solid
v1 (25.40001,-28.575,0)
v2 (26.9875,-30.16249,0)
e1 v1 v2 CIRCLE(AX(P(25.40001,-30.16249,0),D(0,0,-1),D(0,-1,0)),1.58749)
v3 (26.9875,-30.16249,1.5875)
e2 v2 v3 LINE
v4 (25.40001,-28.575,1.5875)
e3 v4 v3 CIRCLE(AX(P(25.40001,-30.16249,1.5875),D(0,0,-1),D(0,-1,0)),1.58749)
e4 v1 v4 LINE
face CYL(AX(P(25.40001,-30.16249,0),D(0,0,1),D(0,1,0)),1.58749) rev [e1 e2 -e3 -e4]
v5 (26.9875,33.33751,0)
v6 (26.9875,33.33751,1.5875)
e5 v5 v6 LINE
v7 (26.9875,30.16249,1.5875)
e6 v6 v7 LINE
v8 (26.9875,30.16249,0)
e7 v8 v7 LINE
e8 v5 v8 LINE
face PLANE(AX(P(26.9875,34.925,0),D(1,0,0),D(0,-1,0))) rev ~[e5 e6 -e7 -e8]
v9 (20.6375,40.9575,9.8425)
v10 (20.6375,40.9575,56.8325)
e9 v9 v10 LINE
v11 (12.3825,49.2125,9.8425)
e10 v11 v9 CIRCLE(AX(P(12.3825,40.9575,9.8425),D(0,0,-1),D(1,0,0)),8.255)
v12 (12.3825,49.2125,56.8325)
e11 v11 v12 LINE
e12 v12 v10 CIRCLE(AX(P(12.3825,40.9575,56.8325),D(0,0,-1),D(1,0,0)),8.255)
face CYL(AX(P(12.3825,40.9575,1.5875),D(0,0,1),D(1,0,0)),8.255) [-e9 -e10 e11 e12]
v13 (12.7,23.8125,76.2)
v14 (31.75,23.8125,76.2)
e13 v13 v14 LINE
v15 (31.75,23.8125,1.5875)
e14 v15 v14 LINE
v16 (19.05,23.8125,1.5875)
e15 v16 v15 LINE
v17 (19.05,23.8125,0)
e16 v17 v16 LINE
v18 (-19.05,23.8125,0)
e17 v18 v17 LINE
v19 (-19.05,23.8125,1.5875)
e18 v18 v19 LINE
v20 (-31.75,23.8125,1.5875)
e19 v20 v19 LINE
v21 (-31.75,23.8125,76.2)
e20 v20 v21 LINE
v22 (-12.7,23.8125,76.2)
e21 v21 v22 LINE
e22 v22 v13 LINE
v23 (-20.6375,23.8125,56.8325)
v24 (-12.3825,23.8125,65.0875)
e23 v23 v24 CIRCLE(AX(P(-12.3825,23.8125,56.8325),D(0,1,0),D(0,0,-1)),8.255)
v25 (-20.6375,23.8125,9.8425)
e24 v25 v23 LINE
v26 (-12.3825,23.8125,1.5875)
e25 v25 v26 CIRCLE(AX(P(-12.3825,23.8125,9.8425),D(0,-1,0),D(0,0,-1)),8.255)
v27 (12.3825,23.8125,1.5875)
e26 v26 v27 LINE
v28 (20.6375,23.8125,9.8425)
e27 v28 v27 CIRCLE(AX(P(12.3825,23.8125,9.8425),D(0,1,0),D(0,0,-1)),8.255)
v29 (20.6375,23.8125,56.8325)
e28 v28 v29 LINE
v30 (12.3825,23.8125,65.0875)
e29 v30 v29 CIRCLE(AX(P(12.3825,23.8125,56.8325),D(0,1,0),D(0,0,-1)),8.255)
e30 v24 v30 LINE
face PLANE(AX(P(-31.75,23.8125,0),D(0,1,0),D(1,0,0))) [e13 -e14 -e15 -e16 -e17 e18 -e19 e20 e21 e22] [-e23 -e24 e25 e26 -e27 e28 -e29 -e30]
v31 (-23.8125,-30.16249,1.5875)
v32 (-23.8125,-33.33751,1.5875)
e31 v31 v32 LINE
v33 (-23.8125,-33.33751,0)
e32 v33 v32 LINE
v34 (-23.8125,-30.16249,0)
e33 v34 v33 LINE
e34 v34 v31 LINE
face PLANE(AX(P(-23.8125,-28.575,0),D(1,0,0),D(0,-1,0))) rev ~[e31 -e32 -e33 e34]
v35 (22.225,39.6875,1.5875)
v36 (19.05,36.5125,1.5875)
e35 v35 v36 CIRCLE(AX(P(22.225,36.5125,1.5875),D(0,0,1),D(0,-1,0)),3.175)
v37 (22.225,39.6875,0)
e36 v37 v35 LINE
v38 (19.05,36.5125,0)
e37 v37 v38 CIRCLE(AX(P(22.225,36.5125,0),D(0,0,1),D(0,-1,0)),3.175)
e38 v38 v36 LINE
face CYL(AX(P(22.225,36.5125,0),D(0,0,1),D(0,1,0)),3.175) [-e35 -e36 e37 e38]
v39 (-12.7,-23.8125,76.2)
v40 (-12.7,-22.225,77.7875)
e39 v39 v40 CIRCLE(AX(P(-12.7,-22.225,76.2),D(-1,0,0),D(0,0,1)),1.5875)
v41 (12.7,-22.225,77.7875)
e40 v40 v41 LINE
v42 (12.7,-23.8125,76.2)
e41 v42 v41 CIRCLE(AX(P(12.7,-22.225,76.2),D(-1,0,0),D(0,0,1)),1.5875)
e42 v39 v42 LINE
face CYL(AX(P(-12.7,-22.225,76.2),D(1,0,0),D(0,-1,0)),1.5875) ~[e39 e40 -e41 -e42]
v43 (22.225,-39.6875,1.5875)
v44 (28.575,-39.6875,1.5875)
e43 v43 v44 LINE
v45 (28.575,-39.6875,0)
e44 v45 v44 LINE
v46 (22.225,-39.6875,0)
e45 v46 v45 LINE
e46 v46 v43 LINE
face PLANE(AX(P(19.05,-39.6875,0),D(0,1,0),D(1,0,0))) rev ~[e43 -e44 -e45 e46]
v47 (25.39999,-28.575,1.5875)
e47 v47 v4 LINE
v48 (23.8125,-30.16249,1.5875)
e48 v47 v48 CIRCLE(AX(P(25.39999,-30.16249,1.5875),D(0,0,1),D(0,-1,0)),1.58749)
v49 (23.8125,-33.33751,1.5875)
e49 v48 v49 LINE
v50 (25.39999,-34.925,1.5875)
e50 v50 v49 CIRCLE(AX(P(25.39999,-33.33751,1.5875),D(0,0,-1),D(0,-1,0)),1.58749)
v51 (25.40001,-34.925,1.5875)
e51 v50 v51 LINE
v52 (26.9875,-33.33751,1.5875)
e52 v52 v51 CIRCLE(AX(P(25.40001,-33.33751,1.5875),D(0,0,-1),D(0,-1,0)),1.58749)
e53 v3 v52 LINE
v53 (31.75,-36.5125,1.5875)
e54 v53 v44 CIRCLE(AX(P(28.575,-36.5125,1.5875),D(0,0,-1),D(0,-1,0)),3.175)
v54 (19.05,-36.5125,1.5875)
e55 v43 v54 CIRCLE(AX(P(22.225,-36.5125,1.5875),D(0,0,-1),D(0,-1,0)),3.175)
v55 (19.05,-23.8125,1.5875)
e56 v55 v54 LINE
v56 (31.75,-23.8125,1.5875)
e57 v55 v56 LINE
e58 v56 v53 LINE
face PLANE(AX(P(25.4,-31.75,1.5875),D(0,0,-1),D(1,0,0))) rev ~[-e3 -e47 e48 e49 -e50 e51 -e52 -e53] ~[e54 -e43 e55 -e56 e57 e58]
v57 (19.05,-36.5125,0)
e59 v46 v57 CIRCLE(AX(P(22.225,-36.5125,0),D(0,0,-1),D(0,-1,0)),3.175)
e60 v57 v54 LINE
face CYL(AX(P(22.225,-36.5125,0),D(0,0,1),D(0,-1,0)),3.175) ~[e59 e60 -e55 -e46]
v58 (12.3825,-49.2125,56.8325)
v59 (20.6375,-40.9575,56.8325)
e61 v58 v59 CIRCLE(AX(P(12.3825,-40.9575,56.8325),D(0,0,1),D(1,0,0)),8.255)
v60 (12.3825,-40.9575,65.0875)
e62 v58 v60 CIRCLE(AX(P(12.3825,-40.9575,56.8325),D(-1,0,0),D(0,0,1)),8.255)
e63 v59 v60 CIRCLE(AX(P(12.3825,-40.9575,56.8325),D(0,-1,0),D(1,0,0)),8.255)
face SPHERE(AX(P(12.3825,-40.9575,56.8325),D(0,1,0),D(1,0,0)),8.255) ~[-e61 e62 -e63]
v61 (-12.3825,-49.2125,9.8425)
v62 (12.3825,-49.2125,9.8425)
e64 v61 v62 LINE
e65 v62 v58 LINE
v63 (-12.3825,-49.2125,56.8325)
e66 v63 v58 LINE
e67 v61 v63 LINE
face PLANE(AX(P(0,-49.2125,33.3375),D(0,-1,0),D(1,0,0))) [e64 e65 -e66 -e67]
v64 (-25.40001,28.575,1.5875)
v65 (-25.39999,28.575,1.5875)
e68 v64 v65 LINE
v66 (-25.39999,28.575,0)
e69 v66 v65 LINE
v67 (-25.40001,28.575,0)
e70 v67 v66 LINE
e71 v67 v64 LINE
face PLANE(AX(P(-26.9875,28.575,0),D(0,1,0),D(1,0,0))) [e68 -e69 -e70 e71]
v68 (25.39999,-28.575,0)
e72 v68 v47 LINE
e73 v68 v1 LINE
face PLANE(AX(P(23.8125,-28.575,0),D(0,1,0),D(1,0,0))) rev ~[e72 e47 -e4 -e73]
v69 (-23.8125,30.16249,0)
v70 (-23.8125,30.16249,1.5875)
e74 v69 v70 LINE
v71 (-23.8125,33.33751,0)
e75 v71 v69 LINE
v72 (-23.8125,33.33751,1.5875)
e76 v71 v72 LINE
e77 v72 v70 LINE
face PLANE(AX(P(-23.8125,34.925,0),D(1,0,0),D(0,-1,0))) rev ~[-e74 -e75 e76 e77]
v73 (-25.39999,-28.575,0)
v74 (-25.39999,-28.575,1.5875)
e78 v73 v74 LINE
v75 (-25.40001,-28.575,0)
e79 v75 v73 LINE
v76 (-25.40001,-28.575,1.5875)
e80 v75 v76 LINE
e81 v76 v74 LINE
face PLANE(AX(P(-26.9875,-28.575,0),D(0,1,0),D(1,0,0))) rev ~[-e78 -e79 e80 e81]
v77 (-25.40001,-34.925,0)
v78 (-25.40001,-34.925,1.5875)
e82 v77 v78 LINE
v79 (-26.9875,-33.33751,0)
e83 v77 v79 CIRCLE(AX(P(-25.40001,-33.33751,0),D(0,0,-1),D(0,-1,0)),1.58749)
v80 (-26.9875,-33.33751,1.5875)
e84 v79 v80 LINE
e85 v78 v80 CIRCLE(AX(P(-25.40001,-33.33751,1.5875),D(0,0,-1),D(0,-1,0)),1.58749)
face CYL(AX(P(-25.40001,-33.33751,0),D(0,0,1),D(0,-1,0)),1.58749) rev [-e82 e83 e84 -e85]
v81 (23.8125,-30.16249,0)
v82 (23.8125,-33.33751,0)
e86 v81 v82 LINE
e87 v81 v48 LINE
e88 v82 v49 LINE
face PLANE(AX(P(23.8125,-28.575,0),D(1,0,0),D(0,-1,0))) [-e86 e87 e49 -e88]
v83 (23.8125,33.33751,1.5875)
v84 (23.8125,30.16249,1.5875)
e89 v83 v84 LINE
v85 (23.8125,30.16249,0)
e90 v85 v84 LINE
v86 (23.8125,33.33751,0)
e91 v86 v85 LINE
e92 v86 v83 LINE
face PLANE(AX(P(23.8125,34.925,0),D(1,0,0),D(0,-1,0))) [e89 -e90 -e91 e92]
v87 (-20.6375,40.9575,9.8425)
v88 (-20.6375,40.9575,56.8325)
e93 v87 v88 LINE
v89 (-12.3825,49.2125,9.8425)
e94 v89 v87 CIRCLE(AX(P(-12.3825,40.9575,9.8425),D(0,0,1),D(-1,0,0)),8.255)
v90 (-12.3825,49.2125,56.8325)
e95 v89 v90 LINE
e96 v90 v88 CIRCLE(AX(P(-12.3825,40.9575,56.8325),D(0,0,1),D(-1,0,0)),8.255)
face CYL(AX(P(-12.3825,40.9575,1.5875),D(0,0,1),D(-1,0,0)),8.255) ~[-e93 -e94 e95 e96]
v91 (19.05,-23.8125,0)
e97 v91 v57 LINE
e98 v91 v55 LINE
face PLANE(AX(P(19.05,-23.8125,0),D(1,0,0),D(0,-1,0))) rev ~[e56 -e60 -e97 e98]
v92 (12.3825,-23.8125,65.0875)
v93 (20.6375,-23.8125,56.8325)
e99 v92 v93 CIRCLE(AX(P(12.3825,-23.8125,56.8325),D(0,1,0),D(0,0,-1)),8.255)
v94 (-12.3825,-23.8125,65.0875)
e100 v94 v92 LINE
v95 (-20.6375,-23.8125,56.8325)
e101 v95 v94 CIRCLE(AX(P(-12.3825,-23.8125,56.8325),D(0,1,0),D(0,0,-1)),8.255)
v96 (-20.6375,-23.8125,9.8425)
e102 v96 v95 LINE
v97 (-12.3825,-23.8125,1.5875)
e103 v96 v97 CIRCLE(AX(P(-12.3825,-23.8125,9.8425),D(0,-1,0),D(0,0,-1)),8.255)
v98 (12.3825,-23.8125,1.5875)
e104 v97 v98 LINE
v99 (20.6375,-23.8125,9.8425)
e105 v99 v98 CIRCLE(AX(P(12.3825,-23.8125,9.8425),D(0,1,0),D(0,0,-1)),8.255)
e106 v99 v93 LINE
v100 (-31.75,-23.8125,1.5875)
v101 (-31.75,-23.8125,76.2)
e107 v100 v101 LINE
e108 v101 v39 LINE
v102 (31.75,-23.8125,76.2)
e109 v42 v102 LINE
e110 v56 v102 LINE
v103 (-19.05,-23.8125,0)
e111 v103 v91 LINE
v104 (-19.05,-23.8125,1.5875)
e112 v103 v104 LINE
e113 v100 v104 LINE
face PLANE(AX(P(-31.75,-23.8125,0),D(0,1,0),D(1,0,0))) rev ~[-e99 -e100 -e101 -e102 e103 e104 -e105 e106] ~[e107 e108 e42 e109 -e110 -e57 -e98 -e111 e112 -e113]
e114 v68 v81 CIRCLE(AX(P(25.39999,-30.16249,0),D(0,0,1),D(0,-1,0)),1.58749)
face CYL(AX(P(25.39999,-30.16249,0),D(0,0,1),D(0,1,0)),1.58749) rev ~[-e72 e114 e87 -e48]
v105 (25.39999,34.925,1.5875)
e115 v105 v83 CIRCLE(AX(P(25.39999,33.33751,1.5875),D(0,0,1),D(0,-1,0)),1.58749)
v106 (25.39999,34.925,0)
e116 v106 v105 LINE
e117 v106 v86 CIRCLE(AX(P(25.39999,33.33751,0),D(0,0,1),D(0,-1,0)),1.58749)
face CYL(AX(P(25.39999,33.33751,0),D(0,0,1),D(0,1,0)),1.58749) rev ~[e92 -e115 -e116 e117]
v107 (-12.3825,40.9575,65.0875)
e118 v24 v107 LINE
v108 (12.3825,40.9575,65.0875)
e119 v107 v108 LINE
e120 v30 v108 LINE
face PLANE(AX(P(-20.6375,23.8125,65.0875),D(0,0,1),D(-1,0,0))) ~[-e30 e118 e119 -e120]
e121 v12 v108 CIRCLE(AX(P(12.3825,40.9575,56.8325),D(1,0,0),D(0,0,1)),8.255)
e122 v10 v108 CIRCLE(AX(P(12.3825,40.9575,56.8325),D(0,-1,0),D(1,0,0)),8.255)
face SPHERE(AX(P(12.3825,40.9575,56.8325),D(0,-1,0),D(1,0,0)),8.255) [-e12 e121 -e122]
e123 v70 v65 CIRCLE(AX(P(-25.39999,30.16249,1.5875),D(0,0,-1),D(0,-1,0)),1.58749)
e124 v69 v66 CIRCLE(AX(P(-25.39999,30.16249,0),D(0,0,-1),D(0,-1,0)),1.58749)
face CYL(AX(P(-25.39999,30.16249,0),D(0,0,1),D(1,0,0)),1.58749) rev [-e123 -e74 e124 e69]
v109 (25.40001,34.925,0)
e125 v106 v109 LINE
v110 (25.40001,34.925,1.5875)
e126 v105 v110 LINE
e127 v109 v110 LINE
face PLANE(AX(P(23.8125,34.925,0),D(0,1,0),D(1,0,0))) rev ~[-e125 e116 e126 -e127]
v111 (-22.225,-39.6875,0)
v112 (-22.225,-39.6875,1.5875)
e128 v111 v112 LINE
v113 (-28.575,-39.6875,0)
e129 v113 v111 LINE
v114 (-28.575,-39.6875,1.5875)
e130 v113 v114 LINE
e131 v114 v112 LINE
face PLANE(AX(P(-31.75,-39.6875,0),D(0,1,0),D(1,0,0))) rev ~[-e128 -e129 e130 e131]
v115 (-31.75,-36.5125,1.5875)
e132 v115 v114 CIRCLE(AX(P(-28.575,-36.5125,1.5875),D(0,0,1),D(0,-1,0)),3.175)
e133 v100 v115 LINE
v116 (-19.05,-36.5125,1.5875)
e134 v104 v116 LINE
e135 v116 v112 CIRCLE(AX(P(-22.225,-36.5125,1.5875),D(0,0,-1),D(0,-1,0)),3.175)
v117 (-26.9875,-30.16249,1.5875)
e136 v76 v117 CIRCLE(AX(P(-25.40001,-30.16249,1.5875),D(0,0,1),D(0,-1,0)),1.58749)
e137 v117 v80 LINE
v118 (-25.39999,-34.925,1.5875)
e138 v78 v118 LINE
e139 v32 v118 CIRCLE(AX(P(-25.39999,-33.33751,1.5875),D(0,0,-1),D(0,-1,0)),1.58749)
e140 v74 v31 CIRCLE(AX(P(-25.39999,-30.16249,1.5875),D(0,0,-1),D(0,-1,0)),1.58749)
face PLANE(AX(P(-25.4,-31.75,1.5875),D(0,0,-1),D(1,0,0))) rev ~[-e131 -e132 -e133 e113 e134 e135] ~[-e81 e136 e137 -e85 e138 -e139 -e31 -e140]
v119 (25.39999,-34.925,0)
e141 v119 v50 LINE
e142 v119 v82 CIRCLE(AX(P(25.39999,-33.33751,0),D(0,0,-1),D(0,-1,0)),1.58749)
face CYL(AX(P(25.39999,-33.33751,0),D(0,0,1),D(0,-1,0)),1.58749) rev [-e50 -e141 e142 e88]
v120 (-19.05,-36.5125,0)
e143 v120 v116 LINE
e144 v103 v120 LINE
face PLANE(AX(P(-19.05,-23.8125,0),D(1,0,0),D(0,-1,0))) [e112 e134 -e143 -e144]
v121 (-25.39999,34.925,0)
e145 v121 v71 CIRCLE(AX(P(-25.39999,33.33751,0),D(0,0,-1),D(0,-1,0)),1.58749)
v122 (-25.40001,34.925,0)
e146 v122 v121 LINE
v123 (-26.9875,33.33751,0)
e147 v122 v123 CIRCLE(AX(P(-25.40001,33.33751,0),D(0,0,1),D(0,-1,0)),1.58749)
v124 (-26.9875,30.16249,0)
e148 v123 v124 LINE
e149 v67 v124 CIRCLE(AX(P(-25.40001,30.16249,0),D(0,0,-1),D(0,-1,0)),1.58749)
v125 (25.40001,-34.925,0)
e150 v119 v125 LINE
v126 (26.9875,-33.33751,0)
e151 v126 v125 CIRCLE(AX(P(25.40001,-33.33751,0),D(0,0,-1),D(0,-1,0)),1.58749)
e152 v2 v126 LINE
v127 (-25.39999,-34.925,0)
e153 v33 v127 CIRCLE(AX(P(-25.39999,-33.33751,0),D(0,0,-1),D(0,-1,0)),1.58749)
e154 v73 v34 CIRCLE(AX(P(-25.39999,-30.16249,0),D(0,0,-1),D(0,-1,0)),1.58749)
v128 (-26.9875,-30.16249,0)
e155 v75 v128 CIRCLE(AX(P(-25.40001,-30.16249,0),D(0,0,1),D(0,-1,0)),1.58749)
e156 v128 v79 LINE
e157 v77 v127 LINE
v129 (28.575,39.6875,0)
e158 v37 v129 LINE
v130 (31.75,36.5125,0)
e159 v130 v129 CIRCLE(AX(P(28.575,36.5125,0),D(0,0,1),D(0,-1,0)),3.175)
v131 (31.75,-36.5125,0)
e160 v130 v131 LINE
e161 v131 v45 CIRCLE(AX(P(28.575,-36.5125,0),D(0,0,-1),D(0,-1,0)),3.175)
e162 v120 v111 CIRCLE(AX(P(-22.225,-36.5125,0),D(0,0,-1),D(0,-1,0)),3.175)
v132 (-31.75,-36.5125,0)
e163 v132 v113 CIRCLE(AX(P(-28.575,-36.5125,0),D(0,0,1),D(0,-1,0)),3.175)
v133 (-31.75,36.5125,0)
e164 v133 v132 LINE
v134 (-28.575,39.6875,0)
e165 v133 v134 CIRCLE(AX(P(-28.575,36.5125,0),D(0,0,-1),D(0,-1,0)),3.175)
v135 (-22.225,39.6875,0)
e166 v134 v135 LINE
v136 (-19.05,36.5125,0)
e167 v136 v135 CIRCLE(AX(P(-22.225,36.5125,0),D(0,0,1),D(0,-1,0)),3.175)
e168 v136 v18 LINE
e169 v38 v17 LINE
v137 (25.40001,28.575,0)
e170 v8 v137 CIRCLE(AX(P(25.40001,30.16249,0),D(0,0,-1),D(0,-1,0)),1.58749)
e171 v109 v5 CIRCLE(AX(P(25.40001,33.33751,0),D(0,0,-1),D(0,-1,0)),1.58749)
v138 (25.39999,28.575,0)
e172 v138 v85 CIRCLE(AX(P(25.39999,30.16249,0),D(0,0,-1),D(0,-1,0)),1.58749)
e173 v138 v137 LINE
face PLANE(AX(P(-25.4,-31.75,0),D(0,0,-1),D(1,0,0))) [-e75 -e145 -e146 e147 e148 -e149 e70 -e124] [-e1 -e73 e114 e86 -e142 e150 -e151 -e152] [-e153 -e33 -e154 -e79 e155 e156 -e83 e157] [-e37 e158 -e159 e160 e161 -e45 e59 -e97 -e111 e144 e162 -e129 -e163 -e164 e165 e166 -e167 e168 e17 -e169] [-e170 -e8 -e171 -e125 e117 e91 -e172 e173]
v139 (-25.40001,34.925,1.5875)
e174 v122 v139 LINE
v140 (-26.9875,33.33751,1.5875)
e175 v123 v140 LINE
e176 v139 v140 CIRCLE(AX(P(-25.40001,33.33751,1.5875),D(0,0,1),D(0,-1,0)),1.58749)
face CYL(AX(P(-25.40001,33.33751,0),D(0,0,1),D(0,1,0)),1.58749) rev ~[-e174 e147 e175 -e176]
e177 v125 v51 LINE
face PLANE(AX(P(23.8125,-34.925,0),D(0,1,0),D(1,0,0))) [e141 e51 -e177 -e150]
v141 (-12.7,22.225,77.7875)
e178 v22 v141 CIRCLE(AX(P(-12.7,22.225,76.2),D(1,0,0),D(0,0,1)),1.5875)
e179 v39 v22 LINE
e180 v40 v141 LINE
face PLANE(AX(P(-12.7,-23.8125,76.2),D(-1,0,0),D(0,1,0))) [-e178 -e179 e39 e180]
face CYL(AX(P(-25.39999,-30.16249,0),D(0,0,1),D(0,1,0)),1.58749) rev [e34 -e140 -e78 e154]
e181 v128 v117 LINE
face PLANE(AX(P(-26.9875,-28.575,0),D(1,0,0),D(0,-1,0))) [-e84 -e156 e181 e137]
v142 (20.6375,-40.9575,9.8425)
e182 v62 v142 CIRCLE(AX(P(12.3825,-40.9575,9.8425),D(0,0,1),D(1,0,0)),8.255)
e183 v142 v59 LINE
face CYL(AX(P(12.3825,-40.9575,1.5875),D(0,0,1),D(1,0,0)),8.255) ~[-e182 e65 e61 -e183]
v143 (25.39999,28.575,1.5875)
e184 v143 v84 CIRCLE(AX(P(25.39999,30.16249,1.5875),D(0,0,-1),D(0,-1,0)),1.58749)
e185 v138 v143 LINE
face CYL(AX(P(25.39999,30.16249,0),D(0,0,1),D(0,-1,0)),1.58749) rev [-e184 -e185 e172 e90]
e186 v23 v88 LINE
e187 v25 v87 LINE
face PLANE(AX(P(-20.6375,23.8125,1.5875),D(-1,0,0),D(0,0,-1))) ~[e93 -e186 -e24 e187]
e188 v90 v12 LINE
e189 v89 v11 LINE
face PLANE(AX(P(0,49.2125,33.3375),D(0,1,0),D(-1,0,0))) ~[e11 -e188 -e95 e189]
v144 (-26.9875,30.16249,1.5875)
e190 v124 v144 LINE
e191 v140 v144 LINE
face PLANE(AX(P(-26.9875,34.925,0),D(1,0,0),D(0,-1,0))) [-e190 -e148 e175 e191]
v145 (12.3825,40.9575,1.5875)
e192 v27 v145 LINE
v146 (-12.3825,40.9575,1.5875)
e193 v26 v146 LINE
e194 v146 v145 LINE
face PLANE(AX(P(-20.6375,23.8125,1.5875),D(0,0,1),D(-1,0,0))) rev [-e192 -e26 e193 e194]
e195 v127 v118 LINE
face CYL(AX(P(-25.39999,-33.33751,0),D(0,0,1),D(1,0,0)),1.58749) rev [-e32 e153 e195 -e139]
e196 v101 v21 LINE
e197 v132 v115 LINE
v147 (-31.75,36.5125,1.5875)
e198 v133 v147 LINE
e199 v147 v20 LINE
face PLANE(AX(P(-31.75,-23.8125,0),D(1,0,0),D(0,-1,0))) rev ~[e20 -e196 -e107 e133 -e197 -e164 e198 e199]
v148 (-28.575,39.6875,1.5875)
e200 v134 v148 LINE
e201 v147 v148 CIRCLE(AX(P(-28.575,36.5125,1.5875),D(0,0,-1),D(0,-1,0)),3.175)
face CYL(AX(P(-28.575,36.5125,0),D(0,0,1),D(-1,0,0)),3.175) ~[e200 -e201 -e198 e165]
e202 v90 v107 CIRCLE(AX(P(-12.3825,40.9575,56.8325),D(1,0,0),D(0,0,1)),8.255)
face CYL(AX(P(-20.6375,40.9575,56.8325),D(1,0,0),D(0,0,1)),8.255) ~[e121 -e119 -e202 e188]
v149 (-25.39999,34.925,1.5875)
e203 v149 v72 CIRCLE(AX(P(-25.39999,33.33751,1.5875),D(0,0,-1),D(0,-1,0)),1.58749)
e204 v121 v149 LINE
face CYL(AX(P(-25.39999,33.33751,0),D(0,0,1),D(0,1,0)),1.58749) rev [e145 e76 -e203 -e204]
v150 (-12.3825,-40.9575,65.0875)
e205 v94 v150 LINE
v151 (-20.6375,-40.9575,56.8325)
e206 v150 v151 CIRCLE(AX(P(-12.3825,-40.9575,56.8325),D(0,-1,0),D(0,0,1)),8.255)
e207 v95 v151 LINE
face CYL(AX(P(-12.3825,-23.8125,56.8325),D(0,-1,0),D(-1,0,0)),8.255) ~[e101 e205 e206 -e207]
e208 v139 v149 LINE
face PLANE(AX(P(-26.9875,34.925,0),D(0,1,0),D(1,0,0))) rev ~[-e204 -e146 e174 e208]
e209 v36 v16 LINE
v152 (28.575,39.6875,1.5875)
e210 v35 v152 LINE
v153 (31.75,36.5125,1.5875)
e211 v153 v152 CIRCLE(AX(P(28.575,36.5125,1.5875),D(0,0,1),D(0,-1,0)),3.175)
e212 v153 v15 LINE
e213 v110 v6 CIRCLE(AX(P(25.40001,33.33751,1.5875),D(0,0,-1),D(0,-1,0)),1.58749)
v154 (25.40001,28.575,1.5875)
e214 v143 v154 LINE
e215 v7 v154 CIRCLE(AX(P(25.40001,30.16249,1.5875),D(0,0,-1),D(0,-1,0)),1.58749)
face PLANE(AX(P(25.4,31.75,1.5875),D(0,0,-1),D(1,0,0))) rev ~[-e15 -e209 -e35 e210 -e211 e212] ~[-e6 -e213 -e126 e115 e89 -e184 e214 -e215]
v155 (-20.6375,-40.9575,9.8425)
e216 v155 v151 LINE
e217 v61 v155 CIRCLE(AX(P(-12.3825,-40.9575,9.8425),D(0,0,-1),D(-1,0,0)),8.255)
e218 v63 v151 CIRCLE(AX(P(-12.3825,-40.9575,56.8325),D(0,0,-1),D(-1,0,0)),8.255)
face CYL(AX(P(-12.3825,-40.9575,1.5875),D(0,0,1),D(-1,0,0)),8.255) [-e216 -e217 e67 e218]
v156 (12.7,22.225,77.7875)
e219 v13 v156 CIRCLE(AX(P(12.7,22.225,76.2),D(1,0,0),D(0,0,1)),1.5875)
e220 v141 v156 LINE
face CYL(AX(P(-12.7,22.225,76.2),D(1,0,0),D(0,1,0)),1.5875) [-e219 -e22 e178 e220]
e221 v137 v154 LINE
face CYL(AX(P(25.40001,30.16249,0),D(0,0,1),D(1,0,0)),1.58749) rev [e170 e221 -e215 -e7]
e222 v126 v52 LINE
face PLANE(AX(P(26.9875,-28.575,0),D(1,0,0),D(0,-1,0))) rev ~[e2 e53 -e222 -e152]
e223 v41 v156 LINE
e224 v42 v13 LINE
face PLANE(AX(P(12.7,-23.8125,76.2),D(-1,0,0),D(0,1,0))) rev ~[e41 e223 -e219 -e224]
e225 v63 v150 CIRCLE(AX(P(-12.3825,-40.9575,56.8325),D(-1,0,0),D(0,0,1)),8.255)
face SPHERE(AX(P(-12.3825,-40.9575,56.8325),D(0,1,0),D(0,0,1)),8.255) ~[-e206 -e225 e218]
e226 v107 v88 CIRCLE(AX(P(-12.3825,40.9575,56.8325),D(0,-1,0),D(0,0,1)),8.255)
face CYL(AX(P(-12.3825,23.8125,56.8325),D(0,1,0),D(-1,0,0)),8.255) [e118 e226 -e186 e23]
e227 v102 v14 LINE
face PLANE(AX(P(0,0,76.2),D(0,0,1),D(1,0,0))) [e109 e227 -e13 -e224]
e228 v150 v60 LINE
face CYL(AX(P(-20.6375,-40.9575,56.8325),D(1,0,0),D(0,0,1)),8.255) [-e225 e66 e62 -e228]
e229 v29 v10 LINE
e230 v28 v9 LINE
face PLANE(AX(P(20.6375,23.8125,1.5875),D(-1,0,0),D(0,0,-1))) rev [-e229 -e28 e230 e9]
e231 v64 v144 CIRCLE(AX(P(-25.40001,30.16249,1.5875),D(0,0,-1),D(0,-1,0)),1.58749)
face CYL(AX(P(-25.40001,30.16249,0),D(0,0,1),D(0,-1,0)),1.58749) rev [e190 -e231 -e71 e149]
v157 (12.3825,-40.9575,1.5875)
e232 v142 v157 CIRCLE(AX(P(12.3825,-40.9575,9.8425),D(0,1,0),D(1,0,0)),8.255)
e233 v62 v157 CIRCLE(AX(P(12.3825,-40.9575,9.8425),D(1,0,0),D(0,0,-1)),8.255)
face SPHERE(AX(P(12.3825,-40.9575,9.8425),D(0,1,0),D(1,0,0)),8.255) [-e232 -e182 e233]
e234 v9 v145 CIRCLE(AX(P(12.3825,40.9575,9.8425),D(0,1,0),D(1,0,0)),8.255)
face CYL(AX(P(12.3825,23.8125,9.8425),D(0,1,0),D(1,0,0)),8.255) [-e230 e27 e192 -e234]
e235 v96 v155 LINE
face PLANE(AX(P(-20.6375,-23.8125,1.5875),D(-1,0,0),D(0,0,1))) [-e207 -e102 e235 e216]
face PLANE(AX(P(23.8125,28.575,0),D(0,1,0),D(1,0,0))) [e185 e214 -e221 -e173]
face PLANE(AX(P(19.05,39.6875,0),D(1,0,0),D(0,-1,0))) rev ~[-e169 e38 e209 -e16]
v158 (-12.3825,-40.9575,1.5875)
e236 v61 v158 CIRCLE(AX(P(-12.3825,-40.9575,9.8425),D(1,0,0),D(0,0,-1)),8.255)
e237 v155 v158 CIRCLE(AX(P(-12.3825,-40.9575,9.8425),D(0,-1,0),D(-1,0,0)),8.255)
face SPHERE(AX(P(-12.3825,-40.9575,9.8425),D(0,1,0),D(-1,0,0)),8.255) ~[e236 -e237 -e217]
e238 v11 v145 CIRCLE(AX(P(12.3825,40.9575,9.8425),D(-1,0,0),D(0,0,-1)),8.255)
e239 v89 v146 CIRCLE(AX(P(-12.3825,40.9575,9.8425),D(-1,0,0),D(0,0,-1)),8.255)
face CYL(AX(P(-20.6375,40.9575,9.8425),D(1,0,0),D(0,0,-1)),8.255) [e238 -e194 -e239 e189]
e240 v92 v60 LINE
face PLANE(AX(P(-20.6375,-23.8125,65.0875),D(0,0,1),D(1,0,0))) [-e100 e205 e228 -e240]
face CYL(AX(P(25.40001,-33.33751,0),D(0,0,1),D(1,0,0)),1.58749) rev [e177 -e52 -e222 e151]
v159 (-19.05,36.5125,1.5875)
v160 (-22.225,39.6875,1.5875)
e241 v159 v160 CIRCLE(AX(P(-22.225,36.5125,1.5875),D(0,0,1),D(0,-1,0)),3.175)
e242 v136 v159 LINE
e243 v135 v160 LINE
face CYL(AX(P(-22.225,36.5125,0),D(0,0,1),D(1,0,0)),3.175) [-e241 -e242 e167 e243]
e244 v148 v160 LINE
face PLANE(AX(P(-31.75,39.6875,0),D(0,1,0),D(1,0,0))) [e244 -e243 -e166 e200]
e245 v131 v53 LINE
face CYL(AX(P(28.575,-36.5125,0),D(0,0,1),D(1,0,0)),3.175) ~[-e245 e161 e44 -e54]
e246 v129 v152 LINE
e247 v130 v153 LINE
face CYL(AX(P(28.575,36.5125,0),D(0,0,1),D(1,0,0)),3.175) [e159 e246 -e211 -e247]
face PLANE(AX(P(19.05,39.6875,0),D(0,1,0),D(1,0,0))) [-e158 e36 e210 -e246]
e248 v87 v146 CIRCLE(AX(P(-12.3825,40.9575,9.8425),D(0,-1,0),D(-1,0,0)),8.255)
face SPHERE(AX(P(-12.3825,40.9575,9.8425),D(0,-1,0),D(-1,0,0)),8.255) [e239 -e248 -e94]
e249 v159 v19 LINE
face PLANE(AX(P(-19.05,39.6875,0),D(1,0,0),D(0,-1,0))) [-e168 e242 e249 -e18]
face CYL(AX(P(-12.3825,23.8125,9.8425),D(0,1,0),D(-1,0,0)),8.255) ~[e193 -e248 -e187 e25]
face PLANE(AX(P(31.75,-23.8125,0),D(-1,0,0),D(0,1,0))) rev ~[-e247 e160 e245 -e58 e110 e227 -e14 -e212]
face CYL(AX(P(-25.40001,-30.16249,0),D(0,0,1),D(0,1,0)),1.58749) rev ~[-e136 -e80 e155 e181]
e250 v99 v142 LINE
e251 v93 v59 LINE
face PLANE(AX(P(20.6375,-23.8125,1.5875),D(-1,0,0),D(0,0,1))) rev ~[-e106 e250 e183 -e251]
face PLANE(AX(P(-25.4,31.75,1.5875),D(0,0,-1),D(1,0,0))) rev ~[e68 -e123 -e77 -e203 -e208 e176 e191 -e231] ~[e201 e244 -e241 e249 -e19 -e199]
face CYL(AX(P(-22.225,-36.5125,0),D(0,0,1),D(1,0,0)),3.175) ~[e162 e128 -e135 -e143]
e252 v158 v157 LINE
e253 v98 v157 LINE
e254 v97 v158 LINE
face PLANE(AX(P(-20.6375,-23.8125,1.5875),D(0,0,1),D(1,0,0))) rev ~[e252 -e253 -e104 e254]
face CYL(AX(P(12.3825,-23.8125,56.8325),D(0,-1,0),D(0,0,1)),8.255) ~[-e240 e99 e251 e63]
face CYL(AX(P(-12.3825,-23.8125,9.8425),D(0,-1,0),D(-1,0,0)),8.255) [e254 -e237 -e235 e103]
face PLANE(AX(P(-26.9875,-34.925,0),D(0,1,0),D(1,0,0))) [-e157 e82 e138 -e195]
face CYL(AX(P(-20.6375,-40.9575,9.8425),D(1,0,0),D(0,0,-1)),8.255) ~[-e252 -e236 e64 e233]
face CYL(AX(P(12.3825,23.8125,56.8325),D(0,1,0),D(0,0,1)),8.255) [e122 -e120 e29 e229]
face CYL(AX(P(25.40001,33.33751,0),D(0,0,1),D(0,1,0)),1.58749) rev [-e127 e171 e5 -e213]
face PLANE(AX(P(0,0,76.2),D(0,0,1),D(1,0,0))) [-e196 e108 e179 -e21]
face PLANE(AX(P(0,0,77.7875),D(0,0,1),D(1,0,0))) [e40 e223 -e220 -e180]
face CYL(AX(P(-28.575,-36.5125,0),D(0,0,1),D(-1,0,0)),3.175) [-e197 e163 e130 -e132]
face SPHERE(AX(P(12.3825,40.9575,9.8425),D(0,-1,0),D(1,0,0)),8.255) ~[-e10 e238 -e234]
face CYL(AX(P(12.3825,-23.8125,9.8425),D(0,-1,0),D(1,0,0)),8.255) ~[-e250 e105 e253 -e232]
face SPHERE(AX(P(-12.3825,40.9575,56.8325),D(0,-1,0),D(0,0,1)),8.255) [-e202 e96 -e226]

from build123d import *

# Parameters (mm, degrees)
F0_W      = 63.5
F0_H      = 47.625
F1_DEPTH  = 76.2
F2_W      = 41.275
F2_H      = 63.5
F3_DEPTH  = 25.4
F4_R      = 8.255
F6_W      = 12.7
F6_H      = 15.875
F7_DEPTH  = 1.5875
F8_R      = 3.175
F9_W      = 3.175
F9_H      = 6.35
F10_DEPTH = 25.4
F11_R     = 1.58749
F12_W     = 25.4
F12_H     = 47.625
F13_DEPTH = 1.5875
F14_R     = 1.5875


# Not quite as in the source:
# - a fillet or chamfer is up to 0.001 mm smaller than in the source, because OpenCascade refuses the exact size


with BuildPart() as f1:
    # F0 (on Top) → F1 (new body)
    with BuildSketch(Plane.XY):
        Rectangle(F0_W, F0_H)
    extrude(amount=F1_DEPTH)

    # F2 (on face) → F3 (join)
    with BuildSketch(Plane.XZ.offset(23.8125)):
        with Locations((0, 33.3375)):
            Rectangle(F2_W, F2_H)
    extrude(amount=F3_DEPTH)

    # F4
    f4_edges = [f1.edges().sort_by_distance(p)[0] for p in [
        (-20.6375, -36.5125, 65.0875),
        (20.6375, -36.5125, 65.0875),
        (-20.6375, -36.5125, 1.5875),
        (20.6375, -36.5125, 1.5875),
        (20.6375, -49.2125, 33.3375),
        (0, -49.2125, 65.0875),
        (-20.6375, -49.2125, 33.3375),
        (0, -49.2125, 1.5875),
    ]]
    fillet(f4_edges, radius=F4_R)

    # F5: F1 across plane


with BuildPart() as f1_1:
    add(f1.part)
    add(f1.part.mirror(Plane.XZ))

    # F6 (on face) → F7 (join)
    with BuildSketch(Plane(origin=(0, 0, 0), x_dir=(1, 0, 0), z_dir=(0, 0, -1))):
        with Locations((-25.4, 31.75)):
            Rectangle(F6_W, F6_H)
        with Locations((25.4, 31.75)):
            Rectangle(F6_W, F6_H)
        with Locations((25.4, -31.75)):
            Rectangle(F6_W, F6_H)
        with Locations((-25.4, -31.75)):
            Rectangle(F6_W, F6_H)
    extrude(amount=-F7_DEPTH)

    # F8
    f8_edges = [f1_1.edges().sort_by_distance(p)[0] for p in [
        (-31.75, -39.6875, 0.79375),
        (-19.05, -39.6875, 0.79375),
        (19.05, -39.6875, 0.79375),
        (31.75, -39.6875, 0.79375),
        (31.75, 39.6875, 0.79375),
        (19.05, 39.6875, 0.79375),
        (-19.05, 39.6875, 0.79375),
        (-31.75, 39.6875, 0.79375),
    ]]
    fillet(f8_edges, radius=F8_R)

    # F9 (on face) → F10 (cut)
    with BuildSketch(Plane(origin=(0, 0, 0), x_dir=(1, 0, 0), z_dir=(0, 0, -1))):
        with Locations((-25.4, 31.75)):
            Rectangle(F9_W, F9_H)
        with Locations((25.4, 31.75)):
            Rectangle(F9_W, F9_H)
        with Locations((25.4, -31.75)):
            Rectangle(F9_W, F9_H)
        with Locations((-25.4, -31.75)):
            Rectangle(F9_W, F9_H)
    extrude(amount=-F10_DEPTH, mode=Mode.SUBTRACT)

    # F11 (radius 1.5875 in the source; OpenCascade refuses exactly that, so slightly less here)
    f11_edges = [f1_1.edges().sort_by_distance(p)[0] for p in [
        (-26.9875, -34.925, 0.79375),
        (-23.8125, -34.925, 0.79375),
        (-26.9875, -28.575, 0.79375),
        (-23.8125, -28.575, 0.79375),
        (26.9875, -28.575, 0.79375),
        (26.9875, -34.925, 0.79375),
        (23.8125, -34.925, 0.79375),
        (23.8125, -28.575, 0.79375),
        (-26.9875, 34.925, 0.79375),
        (-23.8125, 34.925, 0.79375),
        (-23.8125, 28.575, 0.79375),
        (-26.9875, 28.575, 0.79375),
        (23.8125, 28.575, 0.79375),
        (26.9875, 34.925, 0.79375),
        (23.8125, 34.925, 0.79375),
        (26.9875, 28.575, 0.79375),
    ]]
    fillet(f11_edges, radius=F11_R)

    # F12 (on face) → F13 (join)
    with BuildSketch(Plane.XY.offset(76.2)):
        Rectangle(F12_W, F12_H)
    extrude(amount=F13_DEPTH)

    # F14
    f14_edges = [f1_1.edges().sort_by_distance(p)[0] for p in [
        (0, -23.8125, 77.7875),
        (0, 23.8125, 77.7875),
    ]]
    fillet(f14_edges, radius=F14_R)


solid = f1_1.part
